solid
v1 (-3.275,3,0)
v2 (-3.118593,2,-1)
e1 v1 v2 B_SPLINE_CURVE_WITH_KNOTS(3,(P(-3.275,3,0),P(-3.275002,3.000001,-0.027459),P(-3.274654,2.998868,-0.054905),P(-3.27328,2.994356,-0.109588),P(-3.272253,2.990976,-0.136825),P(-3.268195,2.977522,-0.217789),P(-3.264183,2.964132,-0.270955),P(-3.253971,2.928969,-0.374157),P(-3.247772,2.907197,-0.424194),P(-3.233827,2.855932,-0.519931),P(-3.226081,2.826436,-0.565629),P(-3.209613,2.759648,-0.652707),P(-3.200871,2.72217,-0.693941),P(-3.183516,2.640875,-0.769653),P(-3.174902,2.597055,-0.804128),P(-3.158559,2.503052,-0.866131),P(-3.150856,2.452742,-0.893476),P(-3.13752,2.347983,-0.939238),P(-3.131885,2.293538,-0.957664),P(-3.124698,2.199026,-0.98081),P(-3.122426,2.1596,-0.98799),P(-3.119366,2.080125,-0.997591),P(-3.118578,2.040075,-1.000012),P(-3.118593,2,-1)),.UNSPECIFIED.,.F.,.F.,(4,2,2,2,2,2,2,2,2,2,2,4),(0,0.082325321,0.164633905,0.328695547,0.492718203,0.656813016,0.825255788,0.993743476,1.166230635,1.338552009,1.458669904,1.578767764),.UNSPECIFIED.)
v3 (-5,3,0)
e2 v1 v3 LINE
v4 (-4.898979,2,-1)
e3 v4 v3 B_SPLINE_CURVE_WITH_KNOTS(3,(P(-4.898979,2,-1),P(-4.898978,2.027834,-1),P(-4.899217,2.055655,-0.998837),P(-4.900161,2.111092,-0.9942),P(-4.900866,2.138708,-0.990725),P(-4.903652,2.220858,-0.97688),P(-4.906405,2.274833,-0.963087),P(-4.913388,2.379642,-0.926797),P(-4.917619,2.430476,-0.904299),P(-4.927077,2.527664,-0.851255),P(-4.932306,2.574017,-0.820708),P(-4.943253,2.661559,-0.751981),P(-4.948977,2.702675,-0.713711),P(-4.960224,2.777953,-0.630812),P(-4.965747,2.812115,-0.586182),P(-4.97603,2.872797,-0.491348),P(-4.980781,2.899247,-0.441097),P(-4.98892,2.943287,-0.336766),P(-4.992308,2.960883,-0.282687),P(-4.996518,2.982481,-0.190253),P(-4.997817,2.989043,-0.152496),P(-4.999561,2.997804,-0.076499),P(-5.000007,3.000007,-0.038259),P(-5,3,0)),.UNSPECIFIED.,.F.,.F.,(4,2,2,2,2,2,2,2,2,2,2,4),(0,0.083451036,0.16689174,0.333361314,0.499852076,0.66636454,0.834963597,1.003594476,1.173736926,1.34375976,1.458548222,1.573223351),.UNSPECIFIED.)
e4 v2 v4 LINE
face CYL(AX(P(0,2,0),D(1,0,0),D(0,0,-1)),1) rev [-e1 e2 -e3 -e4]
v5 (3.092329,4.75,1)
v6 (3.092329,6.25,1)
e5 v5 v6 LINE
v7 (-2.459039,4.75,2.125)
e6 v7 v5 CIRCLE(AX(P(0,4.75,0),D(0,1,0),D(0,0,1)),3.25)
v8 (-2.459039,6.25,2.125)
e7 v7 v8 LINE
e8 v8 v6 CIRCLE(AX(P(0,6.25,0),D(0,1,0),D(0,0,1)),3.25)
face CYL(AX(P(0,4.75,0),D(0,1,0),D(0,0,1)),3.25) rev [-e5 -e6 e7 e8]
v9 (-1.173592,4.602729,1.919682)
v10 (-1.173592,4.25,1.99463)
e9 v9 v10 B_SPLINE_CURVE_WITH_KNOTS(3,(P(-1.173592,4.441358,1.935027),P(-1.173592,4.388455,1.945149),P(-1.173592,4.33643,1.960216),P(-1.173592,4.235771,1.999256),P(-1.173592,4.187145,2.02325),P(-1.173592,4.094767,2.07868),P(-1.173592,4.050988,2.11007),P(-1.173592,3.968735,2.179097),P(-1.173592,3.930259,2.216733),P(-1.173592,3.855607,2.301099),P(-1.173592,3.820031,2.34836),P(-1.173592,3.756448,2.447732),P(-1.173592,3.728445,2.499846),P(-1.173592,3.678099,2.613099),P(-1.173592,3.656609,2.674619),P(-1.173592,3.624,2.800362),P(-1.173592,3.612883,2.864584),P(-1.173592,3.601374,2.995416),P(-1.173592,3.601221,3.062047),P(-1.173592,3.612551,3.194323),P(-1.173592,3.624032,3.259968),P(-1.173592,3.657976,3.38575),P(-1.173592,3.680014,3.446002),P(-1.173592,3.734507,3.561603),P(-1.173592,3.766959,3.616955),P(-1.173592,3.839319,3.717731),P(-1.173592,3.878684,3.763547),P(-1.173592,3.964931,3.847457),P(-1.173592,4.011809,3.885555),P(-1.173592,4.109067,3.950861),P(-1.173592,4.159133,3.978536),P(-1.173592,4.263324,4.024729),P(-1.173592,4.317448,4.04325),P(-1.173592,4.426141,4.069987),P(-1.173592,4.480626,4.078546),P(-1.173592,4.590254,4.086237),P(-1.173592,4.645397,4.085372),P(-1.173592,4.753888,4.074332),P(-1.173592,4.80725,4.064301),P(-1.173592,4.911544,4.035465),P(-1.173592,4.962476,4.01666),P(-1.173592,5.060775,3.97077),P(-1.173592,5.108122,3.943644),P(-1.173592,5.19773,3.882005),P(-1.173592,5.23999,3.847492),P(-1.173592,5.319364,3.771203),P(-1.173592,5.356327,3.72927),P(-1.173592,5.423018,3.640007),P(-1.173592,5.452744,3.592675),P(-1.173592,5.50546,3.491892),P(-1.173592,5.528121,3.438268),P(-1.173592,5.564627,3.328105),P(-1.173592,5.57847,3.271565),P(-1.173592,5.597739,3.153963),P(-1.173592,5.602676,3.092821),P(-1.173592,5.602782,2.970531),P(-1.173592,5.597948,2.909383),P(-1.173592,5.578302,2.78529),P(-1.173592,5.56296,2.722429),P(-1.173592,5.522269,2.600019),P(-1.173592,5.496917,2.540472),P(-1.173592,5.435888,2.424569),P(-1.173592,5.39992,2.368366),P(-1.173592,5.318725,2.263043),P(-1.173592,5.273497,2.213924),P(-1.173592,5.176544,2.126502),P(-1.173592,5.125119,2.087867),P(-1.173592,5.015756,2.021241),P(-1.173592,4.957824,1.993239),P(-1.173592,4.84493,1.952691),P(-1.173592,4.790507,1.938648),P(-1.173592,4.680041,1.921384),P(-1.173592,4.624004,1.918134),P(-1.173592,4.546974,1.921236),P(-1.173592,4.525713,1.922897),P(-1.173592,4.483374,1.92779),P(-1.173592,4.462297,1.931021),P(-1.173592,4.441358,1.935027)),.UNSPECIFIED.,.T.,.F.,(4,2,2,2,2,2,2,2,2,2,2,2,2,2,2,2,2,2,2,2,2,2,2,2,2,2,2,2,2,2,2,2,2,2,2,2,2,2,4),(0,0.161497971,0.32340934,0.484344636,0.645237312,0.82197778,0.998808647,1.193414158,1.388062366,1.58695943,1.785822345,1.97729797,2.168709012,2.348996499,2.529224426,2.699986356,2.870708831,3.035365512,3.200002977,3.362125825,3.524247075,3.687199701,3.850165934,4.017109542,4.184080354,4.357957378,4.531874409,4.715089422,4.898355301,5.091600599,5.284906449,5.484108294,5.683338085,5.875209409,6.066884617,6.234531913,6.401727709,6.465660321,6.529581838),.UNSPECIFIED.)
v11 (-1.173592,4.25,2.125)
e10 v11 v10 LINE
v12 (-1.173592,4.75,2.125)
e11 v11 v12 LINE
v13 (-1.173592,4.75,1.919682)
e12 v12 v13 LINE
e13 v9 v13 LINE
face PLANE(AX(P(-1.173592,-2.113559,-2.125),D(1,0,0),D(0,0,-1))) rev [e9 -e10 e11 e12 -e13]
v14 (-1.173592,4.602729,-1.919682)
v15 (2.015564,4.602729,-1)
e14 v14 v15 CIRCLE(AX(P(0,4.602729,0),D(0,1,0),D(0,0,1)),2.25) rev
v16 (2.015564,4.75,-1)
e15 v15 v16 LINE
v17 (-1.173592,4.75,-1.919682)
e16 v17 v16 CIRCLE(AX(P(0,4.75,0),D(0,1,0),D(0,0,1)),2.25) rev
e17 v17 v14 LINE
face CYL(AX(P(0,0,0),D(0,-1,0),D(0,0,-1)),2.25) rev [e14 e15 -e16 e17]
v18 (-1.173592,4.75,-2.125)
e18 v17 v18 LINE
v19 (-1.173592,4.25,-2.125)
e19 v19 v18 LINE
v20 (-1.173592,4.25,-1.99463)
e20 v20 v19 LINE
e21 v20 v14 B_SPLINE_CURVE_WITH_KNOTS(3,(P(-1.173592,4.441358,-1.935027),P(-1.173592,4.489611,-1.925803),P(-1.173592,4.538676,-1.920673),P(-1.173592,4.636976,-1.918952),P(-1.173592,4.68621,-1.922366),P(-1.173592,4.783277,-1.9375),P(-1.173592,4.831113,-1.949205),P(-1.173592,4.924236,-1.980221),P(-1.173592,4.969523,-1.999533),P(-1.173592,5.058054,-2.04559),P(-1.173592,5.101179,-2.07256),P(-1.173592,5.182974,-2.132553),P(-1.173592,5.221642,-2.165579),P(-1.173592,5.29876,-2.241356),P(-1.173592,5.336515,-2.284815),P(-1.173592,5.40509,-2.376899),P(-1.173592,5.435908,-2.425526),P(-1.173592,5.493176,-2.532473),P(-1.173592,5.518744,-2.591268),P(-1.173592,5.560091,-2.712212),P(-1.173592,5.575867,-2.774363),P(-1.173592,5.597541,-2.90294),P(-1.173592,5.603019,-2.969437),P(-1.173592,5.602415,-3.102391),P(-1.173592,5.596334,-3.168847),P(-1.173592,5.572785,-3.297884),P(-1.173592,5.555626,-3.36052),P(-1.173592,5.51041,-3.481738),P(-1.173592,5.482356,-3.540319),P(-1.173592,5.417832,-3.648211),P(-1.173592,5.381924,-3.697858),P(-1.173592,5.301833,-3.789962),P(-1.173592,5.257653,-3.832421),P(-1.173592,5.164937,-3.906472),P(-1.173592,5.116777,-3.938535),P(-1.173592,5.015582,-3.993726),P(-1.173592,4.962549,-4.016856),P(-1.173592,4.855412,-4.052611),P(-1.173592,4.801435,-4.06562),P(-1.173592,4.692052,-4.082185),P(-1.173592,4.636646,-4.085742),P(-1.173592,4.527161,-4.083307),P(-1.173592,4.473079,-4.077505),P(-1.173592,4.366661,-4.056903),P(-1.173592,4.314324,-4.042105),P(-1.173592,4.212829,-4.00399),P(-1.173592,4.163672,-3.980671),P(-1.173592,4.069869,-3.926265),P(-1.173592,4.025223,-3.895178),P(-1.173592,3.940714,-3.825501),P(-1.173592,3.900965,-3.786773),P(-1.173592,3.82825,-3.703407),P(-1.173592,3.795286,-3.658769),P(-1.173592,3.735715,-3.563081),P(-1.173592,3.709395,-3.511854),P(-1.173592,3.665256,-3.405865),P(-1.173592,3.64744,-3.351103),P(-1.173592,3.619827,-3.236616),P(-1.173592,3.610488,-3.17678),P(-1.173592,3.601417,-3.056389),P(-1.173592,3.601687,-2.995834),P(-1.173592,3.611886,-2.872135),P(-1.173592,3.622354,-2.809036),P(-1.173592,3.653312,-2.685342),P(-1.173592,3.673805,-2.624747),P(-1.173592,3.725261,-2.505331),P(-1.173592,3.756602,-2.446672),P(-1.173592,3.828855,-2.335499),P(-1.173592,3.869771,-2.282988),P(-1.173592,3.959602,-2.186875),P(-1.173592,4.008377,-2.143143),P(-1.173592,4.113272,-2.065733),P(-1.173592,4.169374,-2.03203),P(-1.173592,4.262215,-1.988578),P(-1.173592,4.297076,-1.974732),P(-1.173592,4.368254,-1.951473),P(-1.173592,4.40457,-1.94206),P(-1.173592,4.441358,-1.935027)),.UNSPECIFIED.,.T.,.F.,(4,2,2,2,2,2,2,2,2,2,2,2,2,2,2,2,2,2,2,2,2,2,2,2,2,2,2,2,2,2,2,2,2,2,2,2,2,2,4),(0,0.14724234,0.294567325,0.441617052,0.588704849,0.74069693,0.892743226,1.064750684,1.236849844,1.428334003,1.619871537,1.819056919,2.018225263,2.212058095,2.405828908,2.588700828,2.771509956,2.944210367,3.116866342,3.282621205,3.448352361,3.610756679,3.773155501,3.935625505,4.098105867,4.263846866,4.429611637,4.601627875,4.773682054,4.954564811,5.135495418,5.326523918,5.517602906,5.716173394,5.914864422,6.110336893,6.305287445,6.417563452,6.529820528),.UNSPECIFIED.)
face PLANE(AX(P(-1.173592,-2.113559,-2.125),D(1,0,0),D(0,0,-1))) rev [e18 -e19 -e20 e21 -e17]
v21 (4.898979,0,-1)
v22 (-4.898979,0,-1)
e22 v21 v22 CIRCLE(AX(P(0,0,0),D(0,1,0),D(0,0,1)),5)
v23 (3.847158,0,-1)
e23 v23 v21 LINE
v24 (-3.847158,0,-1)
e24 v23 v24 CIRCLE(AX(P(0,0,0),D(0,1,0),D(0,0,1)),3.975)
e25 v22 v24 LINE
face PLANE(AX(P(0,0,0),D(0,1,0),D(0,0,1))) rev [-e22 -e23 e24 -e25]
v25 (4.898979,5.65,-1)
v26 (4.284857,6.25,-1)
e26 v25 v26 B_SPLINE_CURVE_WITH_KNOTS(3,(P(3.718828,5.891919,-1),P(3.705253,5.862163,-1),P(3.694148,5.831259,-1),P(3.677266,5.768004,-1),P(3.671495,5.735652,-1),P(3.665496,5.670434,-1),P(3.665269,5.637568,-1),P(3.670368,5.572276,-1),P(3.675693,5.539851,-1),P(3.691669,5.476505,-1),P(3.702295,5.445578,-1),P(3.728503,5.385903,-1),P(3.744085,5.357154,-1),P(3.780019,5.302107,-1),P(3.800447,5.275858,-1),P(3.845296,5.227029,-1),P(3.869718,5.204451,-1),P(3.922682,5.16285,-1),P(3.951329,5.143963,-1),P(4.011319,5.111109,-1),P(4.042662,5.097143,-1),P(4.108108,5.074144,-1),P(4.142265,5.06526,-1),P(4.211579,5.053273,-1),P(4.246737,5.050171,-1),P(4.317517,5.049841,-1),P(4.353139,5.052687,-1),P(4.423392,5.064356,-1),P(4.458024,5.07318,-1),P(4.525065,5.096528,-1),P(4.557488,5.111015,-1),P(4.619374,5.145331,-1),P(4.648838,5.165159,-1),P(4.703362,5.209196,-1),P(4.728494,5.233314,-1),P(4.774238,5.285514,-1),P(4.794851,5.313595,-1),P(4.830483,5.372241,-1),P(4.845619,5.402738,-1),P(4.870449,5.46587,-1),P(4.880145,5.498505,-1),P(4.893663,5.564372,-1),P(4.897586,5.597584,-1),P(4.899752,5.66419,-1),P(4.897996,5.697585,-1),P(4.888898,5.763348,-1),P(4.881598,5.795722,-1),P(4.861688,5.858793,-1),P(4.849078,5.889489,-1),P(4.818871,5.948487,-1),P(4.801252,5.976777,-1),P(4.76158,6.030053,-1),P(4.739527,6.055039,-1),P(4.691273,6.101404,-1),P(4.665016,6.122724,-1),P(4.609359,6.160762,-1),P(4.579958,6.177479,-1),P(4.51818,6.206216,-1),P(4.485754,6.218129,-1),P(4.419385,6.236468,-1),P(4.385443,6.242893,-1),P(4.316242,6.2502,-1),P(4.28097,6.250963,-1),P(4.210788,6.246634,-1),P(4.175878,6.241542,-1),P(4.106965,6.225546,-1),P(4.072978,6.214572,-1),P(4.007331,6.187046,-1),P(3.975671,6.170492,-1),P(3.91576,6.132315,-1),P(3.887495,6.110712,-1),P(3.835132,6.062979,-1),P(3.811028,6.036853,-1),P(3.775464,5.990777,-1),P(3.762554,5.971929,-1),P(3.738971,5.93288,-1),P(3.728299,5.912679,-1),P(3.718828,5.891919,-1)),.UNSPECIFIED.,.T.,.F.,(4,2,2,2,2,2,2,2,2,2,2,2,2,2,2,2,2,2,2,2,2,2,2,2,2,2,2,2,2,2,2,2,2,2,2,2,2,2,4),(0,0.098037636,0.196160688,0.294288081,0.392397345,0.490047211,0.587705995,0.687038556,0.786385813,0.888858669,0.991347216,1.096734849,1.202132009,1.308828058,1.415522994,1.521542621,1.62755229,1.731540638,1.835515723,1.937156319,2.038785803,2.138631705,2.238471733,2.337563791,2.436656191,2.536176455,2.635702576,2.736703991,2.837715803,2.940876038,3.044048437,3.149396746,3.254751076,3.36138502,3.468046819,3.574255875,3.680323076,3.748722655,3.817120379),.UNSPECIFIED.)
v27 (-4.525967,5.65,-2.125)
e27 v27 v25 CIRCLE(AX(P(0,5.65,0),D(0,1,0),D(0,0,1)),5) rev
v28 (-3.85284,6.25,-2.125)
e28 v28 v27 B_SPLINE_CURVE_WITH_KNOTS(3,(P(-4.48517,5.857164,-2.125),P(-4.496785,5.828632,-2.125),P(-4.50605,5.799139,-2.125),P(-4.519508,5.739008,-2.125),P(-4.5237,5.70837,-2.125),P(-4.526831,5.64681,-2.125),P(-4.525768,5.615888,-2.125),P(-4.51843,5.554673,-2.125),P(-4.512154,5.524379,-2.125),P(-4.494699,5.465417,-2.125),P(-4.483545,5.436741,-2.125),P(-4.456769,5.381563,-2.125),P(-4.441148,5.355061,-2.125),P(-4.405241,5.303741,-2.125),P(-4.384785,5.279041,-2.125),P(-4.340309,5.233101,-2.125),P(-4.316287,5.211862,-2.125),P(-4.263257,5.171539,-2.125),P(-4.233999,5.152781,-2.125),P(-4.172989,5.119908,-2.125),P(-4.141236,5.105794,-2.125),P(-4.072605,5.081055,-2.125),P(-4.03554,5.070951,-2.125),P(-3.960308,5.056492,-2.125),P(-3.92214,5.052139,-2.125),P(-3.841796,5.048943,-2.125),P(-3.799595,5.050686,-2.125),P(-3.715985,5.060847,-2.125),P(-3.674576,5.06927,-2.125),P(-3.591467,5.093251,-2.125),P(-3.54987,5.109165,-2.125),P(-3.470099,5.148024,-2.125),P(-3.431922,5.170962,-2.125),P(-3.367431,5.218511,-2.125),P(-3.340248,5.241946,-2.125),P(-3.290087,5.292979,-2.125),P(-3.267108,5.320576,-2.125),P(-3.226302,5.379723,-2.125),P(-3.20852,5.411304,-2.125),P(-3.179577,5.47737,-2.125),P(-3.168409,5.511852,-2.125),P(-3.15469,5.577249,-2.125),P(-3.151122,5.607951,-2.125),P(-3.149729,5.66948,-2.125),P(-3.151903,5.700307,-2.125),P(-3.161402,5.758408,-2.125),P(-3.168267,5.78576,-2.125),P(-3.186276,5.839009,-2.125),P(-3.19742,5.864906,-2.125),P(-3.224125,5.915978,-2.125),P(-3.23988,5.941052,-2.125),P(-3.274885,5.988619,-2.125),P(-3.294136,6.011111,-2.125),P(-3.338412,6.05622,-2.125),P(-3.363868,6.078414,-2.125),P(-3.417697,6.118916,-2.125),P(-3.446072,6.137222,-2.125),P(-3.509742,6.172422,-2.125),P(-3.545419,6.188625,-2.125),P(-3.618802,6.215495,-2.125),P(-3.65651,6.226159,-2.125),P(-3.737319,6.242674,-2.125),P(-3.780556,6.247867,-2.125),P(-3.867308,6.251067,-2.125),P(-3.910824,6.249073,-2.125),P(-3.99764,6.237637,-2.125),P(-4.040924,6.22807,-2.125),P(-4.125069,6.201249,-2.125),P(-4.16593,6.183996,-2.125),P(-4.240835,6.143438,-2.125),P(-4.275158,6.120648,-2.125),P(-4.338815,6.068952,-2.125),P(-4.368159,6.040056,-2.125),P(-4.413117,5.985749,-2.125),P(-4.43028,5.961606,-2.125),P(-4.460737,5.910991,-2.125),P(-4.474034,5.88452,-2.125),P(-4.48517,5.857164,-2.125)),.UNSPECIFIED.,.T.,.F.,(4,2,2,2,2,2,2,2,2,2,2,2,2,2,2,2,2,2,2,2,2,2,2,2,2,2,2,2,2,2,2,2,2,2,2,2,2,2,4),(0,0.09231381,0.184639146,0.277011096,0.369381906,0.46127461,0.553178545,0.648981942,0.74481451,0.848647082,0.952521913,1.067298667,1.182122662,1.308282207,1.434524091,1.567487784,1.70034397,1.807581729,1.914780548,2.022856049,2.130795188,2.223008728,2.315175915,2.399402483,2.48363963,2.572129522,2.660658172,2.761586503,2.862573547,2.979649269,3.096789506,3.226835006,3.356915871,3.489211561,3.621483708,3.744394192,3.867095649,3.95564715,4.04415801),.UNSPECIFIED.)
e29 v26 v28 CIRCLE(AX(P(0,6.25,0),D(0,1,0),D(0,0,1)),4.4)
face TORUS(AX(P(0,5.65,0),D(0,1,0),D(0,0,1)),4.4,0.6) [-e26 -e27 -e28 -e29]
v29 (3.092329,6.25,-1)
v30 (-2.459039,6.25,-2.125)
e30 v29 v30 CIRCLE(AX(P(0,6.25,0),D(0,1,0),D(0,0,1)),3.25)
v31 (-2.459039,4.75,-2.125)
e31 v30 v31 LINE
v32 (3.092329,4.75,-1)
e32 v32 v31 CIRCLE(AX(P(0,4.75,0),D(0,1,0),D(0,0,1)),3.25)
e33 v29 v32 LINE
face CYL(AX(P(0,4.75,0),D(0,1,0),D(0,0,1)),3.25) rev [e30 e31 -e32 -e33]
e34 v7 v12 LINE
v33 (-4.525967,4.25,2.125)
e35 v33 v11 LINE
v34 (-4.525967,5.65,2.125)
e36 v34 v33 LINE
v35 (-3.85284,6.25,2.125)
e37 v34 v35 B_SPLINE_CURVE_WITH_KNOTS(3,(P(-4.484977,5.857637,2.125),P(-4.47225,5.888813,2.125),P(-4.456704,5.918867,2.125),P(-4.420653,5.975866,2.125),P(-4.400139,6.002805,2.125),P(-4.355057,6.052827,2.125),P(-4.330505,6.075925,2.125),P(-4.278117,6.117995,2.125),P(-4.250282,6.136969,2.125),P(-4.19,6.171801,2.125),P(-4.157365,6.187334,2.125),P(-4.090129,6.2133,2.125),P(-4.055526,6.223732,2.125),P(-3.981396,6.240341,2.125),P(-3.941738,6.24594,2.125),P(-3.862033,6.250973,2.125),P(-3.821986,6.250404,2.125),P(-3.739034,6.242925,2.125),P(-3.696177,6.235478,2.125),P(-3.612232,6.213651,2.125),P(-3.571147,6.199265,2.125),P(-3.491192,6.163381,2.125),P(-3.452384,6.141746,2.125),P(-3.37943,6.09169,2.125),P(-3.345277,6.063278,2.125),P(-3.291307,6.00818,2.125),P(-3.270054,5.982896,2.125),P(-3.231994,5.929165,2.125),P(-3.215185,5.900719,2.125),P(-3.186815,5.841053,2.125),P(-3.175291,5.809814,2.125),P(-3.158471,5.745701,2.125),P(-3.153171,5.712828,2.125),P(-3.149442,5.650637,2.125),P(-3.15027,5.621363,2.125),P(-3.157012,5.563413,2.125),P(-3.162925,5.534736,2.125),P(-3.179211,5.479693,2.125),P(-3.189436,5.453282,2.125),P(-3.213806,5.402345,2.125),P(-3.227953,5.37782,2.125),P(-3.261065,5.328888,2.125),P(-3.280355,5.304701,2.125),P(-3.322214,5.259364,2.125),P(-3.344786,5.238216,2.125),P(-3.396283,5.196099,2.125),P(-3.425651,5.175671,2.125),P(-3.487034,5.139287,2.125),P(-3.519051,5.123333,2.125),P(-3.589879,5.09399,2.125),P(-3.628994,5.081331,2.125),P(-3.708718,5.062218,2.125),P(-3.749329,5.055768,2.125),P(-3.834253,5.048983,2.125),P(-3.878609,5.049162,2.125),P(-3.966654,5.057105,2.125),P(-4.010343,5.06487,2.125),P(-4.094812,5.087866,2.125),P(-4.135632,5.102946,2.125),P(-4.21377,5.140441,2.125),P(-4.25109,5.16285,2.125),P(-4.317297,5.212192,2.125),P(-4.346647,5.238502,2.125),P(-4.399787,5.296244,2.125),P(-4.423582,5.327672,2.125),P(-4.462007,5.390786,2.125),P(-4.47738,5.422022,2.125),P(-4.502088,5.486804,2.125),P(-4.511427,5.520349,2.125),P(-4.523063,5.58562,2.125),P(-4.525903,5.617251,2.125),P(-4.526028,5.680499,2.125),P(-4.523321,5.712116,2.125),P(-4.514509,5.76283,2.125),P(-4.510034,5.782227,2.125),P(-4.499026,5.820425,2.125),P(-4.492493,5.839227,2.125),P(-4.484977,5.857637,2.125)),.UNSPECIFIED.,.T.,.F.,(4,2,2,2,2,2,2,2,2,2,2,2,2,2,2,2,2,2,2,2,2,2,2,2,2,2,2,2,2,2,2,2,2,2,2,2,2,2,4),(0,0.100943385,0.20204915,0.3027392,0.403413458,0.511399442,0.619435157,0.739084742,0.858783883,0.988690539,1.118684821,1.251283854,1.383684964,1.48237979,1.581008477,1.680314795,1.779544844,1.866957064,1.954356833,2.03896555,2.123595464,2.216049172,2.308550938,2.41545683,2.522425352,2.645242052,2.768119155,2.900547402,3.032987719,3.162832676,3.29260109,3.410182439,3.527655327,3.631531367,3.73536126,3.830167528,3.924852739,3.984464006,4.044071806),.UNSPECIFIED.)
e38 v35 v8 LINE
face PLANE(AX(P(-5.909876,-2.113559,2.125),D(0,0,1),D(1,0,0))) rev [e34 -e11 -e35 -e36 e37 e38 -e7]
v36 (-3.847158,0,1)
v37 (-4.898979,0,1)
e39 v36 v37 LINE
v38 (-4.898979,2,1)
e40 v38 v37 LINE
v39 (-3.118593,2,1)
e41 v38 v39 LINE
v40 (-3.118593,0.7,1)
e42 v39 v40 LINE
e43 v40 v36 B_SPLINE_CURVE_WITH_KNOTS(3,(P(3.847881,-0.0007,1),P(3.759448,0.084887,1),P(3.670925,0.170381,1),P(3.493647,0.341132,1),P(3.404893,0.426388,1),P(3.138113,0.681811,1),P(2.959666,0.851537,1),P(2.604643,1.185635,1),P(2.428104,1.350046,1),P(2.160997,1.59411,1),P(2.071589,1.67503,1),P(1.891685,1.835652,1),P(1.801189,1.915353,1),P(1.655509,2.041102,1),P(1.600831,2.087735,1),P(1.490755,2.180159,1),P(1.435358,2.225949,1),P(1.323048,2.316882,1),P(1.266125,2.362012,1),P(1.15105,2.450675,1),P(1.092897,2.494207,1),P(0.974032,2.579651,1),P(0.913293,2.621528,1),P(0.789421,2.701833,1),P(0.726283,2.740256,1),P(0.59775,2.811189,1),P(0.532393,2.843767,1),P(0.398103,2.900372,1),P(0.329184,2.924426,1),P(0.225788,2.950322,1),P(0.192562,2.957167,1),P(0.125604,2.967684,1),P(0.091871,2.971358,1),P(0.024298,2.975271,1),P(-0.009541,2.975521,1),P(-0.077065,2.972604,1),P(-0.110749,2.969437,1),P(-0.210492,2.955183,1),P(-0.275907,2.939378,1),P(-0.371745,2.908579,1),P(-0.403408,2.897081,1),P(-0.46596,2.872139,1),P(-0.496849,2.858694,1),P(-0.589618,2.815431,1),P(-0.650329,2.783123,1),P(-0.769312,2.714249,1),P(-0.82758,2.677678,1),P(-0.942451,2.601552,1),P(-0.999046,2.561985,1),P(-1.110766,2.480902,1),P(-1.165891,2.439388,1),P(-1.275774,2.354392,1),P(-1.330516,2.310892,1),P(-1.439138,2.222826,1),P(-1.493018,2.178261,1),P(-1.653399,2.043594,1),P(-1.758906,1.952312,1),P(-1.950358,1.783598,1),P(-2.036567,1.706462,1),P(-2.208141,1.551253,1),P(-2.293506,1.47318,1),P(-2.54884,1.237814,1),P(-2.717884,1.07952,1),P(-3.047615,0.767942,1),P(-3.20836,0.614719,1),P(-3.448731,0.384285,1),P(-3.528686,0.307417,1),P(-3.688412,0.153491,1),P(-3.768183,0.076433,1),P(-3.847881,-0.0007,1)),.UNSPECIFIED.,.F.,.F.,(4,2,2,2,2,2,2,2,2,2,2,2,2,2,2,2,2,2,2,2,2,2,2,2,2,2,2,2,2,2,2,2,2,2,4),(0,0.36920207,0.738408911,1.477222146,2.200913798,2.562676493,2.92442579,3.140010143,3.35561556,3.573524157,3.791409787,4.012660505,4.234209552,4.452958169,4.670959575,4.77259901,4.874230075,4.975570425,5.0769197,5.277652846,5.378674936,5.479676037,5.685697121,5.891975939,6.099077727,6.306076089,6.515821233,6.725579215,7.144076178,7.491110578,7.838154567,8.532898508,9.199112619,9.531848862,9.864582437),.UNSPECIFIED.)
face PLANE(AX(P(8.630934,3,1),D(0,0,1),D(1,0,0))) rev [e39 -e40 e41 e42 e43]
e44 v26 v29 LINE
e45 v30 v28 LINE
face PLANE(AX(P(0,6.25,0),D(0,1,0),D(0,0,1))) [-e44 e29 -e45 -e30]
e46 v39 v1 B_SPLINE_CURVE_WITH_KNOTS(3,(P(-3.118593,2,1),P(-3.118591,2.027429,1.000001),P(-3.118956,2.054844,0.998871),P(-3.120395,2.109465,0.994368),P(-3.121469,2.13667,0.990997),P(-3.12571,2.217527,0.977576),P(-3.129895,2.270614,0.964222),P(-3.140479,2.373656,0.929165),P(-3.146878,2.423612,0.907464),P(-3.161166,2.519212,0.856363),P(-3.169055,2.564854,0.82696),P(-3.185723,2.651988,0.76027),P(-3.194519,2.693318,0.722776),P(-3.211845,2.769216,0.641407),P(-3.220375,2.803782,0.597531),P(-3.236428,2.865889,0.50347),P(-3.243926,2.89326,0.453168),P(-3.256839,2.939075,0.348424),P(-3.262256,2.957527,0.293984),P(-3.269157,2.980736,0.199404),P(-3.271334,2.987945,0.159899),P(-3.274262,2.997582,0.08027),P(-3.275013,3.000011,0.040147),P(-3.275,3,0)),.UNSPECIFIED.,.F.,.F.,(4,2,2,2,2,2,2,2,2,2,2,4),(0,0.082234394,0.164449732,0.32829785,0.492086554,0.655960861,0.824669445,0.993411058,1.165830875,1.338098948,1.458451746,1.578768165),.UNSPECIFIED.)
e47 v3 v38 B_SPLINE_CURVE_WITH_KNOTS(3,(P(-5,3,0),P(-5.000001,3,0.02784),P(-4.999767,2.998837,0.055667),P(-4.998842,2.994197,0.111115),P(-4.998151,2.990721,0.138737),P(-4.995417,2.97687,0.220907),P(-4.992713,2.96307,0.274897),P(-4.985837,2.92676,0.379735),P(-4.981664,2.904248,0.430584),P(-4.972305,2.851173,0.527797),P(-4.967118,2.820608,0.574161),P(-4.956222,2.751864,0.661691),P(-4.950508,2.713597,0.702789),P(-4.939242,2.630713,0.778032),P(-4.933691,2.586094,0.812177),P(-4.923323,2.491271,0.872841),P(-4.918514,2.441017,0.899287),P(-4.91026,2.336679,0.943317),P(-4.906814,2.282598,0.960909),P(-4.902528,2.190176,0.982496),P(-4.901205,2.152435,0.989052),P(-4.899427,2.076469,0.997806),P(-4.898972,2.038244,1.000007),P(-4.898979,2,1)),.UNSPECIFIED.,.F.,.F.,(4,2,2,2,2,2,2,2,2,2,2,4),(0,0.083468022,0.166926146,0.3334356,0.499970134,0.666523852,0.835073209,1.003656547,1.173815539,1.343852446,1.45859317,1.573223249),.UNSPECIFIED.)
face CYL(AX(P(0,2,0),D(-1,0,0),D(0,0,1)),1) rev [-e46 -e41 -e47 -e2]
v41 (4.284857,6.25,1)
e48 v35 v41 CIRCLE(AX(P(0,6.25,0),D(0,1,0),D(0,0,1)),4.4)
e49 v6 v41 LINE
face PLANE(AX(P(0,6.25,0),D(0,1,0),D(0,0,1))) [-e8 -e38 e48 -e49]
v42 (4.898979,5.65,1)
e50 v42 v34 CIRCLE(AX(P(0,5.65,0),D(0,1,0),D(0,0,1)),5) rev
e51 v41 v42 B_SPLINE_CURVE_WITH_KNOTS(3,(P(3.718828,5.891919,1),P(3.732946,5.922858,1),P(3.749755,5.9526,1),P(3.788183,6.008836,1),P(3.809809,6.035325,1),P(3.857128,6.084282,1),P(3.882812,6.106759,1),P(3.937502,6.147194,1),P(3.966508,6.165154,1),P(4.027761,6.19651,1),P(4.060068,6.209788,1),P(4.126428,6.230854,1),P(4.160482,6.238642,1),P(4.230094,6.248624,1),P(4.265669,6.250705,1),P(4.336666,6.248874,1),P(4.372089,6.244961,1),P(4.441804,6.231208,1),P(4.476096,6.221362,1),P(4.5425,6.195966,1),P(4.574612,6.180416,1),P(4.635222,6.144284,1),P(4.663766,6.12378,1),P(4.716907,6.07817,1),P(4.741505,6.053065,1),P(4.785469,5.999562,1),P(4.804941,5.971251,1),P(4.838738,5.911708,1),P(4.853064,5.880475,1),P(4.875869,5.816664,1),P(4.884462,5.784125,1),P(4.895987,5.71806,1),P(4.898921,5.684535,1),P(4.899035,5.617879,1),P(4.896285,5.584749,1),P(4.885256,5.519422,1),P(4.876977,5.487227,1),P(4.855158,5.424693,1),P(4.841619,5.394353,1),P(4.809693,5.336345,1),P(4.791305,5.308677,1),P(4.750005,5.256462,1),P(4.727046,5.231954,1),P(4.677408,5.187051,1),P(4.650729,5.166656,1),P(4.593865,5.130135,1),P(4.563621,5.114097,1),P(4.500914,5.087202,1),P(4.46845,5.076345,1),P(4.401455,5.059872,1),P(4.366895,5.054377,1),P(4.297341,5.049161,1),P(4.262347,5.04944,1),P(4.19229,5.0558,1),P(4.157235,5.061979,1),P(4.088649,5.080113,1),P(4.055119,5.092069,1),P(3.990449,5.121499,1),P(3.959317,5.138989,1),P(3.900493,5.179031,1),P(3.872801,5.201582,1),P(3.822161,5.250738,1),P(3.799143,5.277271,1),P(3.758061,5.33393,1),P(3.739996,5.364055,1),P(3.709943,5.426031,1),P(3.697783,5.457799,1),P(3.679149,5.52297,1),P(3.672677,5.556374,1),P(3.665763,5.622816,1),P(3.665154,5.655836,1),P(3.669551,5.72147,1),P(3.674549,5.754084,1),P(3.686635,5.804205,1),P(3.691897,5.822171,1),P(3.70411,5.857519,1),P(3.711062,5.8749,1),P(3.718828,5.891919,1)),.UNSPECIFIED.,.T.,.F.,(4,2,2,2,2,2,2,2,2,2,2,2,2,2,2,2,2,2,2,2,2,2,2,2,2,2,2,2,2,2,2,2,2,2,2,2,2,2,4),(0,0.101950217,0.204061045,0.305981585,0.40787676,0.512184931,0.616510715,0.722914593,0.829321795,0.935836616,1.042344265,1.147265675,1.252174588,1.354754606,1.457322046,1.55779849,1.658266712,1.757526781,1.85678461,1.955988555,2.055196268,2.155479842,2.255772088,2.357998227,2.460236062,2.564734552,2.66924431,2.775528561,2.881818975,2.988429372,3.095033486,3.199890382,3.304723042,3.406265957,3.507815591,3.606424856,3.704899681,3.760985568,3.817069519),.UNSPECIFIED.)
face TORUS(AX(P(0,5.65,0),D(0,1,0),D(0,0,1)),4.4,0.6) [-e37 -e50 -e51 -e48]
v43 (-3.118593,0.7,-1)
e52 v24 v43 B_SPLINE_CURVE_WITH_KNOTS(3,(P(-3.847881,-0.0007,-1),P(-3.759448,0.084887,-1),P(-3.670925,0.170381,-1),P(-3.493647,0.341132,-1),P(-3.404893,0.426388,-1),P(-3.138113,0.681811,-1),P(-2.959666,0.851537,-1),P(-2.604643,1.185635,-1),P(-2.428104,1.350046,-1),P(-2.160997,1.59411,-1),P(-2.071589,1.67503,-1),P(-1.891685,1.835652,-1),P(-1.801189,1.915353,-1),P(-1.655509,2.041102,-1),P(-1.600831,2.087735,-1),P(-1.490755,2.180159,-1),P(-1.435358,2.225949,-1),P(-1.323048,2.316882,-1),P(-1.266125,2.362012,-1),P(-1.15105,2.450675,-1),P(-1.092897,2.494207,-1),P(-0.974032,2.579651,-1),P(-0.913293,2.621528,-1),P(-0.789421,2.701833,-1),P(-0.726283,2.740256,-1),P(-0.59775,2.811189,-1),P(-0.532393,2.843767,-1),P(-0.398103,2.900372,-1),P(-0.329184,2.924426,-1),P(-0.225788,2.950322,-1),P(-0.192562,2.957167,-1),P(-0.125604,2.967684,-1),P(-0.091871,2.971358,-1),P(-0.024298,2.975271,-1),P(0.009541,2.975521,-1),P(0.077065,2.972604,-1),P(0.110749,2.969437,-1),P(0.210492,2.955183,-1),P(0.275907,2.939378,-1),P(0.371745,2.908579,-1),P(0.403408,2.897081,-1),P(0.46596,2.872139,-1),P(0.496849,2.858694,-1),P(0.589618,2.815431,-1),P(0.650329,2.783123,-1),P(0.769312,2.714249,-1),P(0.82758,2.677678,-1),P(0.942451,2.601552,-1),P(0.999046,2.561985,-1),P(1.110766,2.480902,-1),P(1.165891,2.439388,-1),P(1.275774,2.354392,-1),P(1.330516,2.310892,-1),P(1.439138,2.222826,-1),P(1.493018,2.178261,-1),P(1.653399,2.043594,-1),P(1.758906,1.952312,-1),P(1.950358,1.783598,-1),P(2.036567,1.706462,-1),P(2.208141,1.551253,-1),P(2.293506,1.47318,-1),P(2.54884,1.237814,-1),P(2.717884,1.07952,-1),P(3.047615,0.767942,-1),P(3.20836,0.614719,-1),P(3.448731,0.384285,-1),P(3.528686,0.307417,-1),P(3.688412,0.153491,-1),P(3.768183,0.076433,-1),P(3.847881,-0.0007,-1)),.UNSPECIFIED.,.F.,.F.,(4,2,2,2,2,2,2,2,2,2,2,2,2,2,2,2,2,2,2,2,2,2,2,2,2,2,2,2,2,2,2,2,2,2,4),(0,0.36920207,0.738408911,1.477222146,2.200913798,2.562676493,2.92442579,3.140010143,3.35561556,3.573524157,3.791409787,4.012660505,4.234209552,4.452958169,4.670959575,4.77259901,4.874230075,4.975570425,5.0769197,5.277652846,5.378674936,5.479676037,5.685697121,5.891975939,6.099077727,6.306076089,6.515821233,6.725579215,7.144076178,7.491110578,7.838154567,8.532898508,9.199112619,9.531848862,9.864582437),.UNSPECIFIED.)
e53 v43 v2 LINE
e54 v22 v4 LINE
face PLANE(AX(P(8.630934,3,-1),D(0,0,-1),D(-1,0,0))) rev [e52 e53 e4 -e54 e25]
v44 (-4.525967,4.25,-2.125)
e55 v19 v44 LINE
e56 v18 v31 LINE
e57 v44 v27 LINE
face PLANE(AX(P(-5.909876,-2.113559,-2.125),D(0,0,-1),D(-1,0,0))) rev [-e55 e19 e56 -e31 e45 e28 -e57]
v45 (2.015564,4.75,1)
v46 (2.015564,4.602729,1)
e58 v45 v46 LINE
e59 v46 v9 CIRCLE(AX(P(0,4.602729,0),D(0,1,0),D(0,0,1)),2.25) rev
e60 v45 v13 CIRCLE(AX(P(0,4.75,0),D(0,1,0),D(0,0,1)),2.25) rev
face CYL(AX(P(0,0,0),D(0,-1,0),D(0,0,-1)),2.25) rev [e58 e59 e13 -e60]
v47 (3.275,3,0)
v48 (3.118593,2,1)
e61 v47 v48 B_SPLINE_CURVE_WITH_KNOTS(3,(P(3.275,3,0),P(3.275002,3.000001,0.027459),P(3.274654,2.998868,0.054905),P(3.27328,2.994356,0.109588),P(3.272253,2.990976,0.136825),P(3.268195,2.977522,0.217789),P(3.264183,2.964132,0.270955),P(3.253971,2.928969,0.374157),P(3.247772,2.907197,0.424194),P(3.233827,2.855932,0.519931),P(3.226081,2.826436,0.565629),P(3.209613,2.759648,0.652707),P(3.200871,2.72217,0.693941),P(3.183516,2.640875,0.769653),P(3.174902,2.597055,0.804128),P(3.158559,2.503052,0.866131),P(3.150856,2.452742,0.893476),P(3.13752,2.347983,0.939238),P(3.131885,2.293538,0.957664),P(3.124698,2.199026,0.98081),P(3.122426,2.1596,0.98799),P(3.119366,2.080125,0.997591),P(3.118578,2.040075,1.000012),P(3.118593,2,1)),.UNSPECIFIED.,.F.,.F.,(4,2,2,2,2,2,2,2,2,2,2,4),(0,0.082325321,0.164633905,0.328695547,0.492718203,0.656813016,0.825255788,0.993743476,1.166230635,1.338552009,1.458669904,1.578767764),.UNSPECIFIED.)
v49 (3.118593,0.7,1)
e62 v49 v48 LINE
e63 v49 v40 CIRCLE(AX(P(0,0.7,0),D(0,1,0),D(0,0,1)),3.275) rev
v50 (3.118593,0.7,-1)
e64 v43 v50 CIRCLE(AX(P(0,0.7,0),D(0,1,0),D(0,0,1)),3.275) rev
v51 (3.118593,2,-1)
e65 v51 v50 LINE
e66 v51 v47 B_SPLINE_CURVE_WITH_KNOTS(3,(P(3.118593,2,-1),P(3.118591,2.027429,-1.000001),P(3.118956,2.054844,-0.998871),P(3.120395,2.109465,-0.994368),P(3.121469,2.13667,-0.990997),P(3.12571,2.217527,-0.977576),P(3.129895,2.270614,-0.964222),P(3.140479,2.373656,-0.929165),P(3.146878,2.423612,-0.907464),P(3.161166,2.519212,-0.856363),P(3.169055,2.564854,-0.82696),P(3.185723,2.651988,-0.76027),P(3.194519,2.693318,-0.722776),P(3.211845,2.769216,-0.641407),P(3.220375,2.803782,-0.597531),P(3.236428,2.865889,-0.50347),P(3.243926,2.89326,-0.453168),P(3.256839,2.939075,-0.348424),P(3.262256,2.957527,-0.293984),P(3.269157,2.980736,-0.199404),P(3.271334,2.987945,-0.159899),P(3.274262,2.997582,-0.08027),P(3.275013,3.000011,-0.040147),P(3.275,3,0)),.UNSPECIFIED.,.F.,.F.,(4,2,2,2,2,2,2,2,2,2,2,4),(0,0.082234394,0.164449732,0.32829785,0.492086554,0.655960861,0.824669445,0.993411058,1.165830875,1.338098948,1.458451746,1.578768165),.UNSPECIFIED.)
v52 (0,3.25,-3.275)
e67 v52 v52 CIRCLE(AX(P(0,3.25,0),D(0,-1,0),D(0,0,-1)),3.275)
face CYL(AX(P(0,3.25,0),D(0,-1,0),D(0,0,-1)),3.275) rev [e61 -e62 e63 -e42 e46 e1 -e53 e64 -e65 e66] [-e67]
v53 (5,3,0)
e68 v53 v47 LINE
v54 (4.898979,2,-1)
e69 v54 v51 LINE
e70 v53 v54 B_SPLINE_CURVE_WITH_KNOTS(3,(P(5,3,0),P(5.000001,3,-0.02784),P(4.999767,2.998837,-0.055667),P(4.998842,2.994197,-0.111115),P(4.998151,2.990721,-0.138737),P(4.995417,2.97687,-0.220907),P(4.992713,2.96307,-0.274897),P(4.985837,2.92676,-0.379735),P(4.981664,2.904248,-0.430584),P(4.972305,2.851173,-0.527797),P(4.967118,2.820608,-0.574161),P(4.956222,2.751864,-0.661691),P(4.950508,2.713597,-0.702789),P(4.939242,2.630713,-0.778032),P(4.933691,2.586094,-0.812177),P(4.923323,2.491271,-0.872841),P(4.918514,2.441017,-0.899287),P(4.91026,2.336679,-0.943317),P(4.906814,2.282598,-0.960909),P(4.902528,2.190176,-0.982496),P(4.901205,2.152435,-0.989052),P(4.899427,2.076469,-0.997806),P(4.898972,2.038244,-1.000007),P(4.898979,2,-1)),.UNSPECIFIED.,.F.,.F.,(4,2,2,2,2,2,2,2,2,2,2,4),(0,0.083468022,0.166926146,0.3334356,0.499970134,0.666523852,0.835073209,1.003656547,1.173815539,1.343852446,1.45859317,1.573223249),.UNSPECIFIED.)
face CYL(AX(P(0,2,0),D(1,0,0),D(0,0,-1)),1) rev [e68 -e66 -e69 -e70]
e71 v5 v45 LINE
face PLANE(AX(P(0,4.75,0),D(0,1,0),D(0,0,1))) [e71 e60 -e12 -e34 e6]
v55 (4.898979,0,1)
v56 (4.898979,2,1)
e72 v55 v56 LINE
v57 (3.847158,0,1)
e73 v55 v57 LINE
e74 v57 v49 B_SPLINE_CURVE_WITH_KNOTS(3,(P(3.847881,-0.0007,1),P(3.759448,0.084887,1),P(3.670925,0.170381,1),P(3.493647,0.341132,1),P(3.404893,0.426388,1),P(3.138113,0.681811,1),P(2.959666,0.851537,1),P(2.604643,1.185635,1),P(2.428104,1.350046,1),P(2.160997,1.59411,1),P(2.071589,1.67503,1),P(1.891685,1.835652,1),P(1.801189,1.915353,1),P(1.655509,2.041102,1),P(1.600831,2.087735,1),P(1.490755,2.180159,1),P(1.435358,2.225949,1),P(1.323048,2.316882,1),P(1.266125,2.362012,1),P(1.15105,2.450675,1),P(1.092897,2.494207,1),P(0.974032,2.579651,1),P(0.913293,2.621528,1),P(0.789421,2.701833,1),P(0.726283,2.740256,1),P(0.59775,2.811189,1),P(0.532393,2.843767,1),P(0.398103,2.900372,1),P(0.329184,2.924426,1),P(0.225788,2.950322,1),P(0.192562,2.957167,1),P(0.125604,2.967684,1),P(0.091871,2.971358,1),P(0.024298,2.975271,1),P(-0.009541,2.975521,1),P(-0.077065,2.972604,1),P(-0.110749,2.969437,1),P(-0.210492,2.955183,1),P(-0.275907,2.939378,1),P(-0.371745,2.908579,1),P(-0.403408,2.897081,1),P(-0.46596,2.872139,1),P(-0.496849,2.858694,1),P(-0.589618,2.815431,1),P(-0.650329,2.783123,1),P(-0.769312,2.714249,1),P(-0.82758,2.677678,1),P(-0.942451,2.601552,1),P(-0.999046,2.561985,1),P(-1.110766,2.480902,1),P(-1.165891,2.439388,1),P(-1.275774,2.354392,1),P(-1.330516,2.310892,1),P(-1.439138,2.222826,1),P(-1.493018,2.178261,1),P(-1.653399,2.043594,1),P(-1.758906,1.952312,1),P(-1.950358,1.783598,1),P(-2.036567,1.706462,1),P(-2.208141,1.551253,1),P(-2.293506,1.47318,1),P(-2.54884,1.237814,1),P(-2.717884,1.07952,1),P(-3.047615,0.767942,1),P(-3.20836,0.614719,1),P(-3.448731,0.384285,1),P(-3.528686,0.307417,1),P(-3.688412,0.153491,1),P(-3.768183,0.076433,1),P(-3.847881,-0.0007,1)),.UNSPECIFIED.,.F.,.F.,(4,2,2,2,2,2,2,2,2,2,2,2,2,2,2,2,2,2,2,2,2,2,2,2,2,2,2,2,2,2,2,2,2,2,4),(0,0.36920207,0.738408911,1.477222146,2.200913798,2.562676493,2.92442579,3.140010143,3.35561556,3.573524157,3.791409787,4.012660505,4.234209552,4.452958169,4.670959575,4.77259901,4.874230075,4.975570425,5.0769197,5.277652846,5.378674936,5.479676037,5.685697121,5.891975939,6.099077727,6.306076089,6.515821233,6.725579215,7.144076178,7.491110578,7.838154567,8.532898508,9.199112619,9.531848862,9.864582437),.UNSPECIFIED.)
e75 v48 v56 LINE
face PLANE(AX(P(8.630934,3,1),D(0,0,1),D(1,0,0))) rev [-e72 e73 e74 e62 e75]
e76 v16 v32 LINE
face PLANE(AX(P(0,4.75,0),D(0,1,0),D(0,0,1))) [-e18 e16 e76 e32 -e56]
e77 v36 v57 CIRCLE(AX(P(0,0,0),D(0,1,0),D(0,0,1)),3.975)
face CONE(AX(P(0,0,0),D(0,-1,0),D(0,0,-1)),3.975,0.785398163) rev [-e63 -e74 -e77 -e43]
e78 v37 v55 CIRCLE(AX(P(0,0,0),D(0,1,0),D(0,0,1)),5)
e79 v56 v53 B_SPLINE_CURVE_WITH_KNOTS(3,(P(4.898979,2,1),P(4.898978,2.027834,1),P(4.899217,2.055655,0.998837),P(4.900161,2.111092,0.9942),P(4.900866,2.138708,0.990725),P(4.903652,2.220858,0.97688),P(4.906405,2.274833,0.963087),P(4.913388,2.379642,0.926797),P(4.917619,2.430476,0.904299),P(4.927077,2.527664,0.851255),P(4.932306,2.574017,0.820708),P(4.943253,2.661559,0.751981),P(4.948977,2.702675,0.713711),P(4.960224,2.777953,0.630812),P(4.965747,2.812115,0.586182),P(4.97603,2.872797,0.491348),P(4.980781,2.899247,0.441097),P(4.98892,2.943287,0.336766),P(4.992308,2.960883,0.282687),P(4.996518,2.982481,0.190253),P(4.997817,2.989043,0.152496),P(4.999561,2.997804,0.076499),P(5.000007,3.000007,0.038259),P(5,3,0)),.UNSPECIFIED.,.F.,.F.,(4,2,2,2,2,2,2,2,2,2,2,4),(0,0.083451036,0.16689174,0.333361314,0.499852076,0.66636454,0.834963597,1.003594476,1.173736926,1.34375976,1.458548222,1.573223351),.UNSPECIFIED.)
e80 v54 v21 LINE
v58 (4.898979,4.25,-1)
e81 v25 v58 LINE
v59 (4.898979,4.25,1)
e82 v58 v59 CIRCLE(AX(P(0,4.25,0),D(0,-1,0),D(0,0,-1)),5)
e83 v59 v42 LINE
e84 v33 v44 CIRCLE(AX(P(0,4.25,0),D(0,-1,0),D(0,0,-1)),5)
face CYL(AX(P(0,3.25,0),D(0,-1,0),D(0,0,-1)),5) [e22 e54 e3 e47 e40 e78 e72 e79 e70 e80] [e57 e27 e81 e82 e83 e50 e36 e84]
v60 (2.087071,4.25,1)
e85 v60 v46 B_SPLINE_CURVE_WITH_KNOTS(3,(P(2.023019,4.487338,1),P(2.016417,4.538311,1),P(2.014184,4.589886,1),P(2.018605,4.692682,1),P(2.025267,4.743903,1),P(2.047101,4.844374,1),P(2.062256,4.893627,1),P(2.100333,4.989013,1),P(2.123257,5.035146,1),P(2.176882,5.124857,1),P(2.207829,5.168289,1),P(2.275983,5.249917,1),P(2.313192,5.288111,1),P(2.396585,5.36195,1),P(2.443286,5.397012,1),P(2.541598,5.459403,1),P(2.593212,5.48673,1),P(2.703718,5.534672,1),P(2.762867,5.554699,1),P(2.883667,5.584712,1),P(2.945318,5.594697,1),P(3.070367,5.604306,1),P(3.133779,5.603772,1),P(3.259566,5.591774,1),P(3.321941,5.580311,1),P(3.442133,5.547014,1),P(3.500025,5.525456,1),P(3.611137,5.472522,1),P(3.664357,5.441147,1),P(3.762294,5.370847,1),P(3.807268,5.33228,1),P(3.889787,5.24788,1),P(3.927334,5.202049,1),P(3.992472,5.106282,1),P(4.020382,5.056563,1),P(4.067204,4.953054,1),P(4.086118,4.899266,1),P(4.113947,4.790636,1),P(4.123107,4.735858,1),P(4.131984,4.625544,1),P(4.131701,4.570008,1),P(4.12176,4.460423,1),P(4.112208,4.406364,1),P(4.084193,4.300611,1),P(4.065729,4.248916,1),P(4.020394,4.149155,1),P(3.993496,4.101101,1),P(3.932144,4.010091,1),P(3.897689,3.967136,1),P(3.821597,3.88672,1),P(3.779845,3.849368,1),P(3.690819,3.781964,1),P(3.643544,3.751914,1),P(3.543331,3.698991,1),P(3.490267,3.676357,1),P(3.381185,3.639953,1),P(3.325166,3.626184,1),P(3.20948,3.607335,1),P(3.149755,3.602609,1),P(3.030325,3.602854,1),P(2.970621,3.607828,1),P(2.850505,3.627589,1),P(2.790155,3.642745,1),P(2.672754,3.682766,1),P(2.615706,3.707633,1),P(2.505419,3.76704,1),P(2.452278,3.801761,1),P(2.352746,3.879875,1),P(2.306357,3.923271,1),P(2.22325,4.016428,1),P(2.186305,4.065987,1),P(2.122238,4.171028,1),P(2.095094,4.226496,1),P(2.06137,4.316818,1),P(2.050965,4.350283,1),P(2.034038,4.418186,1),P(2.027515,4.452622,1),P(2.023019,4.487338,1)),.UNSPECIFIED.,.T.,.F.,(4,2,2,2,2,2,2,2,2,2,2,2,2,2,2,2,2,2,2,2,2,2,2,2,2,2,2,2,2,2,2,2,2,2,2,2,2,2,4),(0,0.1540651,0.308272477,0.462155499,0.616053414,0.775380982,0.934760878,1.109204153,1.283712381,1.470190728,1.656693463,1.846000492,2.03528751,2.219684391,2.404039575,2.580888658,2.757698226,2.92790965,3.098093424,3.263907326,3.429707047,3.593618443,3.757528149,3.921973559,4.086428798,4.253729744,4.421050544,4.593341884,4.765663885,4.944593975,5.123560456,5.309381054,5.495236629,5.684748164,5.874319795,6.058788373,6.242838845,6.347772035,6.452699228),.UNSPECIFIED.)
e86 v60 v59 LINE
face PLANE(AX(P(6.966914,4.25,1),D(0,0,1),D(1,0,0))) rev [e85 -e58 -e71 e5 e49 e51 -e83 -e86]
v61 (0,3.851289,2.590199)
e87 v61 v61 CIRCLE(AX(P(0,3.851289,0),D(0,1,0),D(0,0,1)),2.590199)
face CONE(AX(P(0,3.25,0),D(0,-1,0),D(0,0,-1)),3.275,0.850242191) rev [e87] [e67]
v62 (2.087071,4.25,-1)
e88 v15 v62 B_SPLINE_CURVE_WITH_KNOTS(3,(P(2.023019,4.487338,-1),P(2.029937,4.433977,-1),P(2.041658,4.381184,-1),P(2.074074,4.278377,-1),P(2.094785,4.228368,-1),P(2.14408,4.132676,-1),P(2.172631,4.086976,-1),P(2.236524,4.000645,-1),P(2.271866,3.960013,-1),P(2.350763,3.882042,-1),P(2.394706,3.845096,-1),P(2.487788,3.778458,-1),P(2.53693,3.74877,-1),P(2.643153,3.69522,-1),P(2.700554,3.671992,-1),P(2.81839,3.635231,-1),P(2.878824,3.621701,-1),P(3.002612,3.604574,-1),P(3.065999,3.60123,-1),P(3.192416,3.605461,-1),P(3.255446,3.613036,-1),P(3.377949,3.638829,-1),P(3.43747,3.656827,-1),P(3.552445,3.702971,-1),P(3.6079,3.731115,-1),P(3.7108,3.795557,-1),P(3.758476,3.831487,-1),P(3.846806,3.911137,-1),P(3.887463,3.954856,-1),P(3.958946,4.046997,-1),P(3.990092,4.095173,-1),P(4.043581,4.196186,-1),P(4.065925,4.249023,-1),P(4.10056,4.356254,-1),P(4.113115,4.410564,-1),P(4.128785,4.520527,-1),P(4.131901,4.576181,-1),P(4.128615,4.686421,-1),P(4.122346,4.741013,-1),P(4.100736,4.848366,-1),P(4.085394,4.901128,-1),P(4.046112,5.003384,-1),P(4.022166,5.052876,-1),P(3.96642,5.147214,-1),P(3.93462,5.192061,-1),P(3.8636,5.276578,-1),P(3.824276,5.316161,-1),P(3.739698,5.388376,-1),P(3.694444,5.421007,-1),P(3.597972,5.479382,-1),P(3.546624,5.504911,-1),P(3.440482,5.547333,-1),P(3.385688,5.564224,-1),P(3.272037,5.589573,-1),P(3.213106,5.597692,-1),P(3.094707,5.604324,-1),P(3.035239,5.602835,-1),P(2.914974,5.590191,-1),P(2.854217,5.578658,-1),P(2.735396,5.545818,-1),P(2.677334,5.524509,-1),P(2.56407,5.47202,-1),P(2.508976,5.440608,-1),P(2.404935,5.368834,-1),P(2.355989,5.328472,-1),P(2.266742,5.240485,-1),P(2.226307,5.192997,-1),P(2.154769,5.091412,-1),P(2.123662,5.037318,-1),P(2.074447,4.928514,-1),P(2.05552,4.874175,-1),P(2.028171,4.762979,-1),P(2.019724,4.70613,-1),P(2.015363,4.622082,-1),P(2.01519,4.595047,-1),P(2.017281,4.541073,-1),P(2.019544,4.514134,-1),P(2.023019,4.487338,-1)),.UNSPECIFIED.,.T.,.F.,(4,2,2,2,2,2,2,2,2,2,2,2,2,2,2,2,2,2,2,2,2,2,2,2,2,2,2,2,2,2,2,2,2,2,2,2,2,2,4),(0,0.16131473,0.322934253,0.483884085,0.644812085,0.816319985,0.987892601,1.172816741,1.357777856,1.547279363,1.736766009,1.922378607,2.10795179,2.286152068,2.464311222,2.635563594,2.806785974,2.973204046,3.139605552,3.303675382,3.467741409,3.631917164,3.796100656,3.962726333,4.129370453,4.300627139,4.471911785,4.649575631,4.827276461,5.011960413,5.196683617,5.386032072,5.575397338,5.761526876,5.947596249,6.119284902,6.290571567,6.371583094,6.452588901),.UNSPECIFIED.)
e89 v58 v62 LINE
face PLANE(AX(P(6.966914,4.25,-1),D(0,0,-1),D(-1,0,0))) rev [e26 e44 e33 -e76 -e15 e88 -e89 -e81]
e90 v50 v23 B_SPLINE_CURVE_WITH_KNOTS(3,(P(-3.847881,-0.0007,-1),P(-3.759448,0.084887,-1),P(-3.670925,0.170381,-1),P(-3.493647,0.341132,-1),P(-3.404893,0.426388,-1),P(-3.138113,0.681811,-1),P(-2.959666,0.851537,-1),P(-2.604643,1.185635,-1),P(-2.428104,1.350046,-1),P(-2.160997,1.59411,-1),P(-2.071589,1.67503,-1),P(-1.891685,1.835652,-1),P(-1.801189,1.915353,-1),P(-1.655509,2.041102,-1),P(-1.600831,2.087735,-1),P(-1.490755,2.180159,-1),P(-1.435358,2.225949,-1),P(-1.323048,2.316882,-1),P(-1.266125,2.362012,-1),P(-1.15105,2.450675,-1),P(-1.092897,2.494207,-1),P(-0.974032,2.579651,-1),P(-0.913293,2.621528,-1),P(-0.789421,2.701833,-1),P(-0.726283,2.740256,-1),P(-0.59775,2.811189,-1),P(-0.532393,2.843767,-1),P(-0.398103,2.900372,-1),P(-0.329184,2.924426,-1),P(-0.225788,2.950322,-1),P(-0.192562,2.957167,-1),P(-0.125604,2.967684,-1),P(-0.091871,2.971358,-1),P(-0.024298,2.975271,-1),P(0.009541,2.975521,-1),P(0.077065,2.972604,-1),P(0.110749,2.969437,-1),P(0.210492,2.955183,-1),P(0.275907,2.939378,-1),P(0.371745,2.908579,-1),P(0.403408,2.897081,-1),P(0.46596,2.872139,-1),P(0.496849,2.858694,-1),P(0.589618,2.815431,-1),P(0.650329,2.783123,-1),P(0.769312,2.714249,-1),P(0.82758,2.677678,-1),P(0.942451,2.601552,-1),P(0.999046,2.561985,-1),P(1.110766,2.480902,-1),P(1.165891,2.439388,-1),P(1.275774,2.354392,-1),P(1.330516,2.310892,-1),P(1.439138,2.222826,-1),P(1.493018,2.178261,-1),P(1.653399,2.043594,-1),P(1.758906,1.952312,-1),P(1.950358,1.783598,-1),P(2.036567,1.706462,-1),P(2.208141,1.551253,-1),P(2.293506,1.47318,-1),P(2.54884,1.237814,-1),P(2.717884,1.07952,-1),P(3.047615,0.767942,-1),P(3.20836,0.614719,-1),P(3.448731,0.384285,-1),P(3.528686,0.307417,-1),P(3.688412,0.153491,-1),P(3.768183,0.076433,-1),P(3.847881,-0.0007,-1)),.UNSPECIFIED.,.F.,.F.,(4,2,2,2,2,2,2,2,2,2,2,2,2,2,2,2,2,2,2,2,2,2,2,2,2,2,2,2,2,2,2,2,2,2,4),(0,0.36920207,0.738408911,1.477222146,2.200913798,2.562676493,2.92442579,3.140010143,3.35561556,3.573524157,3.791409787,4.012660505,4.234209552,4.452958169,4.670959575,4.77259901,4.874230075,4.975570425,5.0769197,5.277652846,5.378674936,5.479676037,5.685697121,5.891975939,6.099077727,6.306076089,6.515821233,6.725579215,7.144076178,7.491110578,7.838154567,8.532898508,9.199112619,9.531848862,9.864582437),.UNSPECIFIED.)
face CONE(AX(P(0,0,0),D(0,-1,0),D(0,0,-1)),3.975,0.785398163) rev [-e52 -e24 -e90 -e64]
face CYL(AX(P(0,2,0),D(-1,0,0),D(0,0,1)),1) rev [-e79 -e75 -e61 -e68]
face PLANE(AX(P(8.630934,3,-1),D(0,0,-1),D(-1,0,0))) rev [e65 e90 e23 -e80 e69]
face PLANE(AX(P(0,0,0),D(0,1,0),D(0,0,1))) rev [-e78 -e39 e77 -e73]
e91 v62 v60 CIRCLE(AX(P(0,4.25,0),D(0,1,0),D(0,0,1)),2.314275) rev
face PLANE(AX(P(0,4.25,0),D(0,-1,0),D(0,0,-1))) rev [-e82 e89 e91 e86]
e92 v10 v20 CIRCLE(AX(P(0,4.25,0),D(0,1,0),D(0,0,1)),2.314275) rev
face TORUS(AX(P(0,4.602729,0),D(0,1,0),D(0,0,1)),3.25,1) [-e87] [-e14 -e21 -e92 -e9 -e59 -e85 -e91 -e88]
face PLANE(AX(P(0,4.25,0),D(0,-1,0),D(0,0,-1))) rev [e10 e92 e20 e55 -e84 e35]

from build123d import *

# Parameters (mm, degrees)
CROQUIS1_R              = 5
CROQUIS1_R_2            = 3.275
SALIENTE_EXTRUIR1_DEPTH = 3.25
CROQUIS3_R              = 5
CROQUIS3_R_2            = 2.25
SALIENTE_EXTRUIR2_DEPTH = 2
REDONDEO1_R             = 0.6
REDONDEO2_R             = 1
CHAFL_N1_SIZE           = 0.7
CHAFL_N2_SIZE           = 0.5
SKETCH1_W               = 13.933828458
SKETCH1_H               = 2
CUT_EXTRUDE1_DEPTH      = 2
SKETCH2_R               = 3.25
CUT_EXTRUDE2_DEPTH      = 1.5
SKETCH3_W               = 17.261868402
SKETCH3_H               = 2
CUT_EXTRUDE3_DEPTH      = 3
CUT_EXTRUDE4_REACH      = 11.437
SKETCH4_W               = 4.736283822
SKETCH4_H               = 4.25
FILLET1_R               = 1


with BuildPart() as part:
    # Croquis1 → Saliente-Extruir1 (new body)
    with BuildSketch(Plane(origin=(0, 0, 0), x_dir=(1, 0, 0), z_dir=(0, 1, 0))):
        with Locations(Location((0, 0, 0), (0, 0, 90))):
            Circle(CROQUIS1_R)
        with Locations(Location((0, 0, 0), (0, 0, 90))):
            Circle(CROQUIS1_R_2, mode=Mode.SUBTRACT)
    extrude(amount=SALIENTE_EXTRUIR1_DEPTH)

    # Croquis2 → Revolución1 (revolve)
    with BuildSketch(Plane.XY, mode=Mode.PRIVATE) as revoluci_n1_sk:
        Polygon((-5, 3.25), (-5, 4.25), (-2.25, 4.25), (-2.25, 4.15), (-3.275, 3.25), align=None)
    revolve(revoluci_n1_sk.sketch.rotate(Axis((0, 0, 0), (0, 1, 0)), 270), axis=Axis((0, 0, 0), (0, 1, 0)))

    # Croquis3 → Saliente-Extruir2 (add)
    with BuildSketch(Plane(origin=(0, 4.25, 0), x_dir=(1, 0, 0), z_dir=(0, 1, 0))):
        with Locations(Location((0, 0, 0), (0, 0, 90))):
            Circle(CROQUIS3_R)
        with Locations(Location((0, 0, 0), (0, 0, 90))):
            Circle(CROQUIS3_R_2, mode=Mode.SUBTRACT)
    extrude(amount=SALIENTE_EXTRUIR2_DEPTH)

    # Redondeo1
    redondeo1_edges = [part.edges().sort_by_distance(p)[0] for p in [
        (0, 6.25, 5),
    ]]
    fillet(redondeo1_edges, radius=REDONDEO1_R)

    # Redondeo2
    redondeo2_edges = [part.edges().sort_by_distance(p)[0] for p in [
        (0, 4.15, 2.25),
    ]]
    fillet(redondeo2_edges, radius=REDONDEO2_R)

    # Chaflán1
    chafl_n1_edges = [part.edges().sort_by_distance(p)[0] for p in [
        (0, 0, 3.275),
    ]]
    chamfer(chafl_n1_edges, length=CHAFL_N1_SIZE)

    # Chaflán2
    chafl_n2_edges = [part.edges().sort_by_distance(p)[0] for p in [
        (0, 6.25, 2.25),
    ]]
    chamfer(chafl_n2_edges, length=CHAFL_N2_SIZE)

    # Sketch1 → Cut-Extrude1 (cut)
    with BuildSketch(Plane(origin=(0, 6.25, 0), x_dir=(1, 0, 0), z_dir=(0, 1, 0))):
        Rectangle(SKETCH1_W, SKETCH1_H)
    extrude(amount=-CUT_EXTRUDE1_DEPTH, mode=Mode.SUBTRACT)

    # Sketch2 → Cut-Extrude2 (cut)
    with BuildSketch(Plane(origin=(0, 6.25, 0), x_dir=(1, 0, 0), z_dir=(0, 1, 0))):
        Circle(SKETCH2_R)
    extrude(amount=-CUT_EXTRUDE2_DEPTH, mode=Mode.SUBTRACT)

    # Sketch3 → Cut-Extrude3 (cut)
    with BuildSketch(Plane.XZ):
        Rectangle(SKETCH3_W, SKETCH3_H)
    extrude(amount=-CUT_EXTRUDE3_DEPTH, mode=Mode.SUBTRACT)

    # Cut-Extrude4: up to this face of the body (flat: up to its plane)
    cut_extrude4_end = Plane(part.part.faces().sort_by_distance((3.602612573, 4.25, -9.08e-07))[0])
    # Sketch4 → Cut-Extrude4 (cut, up to the picked face)
    with BuildSketch(Plane(origin=(0, 6.25, 0), x_dir=(1, 0, 0), z_dir=(0, 1, 0)), mode=Mode.PRIVATE) as cut_extrude4_sk1:
        with Locations((-3.541734363, 0)):
            Rectangle(SKETCH4_W, SKETCH4_H)
    cut_extrude4_tool1 = split(extrude(cut_extrude4_sk1.sketch, amount=-CUT_EXTRUDE4_REACH, mode=Mode.PRIVATE), bisect_by=cut_extrude4_end, keep=Keep.BOTH, mode=Mode.PRIVATE)
    add(cut_extrude4_tool1.solids().sort_by(Axis((-3.541734, 6.25, 0), (0, -1, 0)))[0], mode=Mode.SUBTRACT)

    # Fillet1
    fillet1_edges = [part.edges().sort_by_distance(p)[0] for p in [
        (4.008786459, 3, -1),
        (-4.008786459, 3, -1),
        (4.008786459, 3, 1),
        (-4.008786459, 3, 1),
    ]]
    fillet(fillet1_edges, radius=FILLET1_R - 0.0001)  # a hair under: the kernel refuses the full size


solid = part.part
